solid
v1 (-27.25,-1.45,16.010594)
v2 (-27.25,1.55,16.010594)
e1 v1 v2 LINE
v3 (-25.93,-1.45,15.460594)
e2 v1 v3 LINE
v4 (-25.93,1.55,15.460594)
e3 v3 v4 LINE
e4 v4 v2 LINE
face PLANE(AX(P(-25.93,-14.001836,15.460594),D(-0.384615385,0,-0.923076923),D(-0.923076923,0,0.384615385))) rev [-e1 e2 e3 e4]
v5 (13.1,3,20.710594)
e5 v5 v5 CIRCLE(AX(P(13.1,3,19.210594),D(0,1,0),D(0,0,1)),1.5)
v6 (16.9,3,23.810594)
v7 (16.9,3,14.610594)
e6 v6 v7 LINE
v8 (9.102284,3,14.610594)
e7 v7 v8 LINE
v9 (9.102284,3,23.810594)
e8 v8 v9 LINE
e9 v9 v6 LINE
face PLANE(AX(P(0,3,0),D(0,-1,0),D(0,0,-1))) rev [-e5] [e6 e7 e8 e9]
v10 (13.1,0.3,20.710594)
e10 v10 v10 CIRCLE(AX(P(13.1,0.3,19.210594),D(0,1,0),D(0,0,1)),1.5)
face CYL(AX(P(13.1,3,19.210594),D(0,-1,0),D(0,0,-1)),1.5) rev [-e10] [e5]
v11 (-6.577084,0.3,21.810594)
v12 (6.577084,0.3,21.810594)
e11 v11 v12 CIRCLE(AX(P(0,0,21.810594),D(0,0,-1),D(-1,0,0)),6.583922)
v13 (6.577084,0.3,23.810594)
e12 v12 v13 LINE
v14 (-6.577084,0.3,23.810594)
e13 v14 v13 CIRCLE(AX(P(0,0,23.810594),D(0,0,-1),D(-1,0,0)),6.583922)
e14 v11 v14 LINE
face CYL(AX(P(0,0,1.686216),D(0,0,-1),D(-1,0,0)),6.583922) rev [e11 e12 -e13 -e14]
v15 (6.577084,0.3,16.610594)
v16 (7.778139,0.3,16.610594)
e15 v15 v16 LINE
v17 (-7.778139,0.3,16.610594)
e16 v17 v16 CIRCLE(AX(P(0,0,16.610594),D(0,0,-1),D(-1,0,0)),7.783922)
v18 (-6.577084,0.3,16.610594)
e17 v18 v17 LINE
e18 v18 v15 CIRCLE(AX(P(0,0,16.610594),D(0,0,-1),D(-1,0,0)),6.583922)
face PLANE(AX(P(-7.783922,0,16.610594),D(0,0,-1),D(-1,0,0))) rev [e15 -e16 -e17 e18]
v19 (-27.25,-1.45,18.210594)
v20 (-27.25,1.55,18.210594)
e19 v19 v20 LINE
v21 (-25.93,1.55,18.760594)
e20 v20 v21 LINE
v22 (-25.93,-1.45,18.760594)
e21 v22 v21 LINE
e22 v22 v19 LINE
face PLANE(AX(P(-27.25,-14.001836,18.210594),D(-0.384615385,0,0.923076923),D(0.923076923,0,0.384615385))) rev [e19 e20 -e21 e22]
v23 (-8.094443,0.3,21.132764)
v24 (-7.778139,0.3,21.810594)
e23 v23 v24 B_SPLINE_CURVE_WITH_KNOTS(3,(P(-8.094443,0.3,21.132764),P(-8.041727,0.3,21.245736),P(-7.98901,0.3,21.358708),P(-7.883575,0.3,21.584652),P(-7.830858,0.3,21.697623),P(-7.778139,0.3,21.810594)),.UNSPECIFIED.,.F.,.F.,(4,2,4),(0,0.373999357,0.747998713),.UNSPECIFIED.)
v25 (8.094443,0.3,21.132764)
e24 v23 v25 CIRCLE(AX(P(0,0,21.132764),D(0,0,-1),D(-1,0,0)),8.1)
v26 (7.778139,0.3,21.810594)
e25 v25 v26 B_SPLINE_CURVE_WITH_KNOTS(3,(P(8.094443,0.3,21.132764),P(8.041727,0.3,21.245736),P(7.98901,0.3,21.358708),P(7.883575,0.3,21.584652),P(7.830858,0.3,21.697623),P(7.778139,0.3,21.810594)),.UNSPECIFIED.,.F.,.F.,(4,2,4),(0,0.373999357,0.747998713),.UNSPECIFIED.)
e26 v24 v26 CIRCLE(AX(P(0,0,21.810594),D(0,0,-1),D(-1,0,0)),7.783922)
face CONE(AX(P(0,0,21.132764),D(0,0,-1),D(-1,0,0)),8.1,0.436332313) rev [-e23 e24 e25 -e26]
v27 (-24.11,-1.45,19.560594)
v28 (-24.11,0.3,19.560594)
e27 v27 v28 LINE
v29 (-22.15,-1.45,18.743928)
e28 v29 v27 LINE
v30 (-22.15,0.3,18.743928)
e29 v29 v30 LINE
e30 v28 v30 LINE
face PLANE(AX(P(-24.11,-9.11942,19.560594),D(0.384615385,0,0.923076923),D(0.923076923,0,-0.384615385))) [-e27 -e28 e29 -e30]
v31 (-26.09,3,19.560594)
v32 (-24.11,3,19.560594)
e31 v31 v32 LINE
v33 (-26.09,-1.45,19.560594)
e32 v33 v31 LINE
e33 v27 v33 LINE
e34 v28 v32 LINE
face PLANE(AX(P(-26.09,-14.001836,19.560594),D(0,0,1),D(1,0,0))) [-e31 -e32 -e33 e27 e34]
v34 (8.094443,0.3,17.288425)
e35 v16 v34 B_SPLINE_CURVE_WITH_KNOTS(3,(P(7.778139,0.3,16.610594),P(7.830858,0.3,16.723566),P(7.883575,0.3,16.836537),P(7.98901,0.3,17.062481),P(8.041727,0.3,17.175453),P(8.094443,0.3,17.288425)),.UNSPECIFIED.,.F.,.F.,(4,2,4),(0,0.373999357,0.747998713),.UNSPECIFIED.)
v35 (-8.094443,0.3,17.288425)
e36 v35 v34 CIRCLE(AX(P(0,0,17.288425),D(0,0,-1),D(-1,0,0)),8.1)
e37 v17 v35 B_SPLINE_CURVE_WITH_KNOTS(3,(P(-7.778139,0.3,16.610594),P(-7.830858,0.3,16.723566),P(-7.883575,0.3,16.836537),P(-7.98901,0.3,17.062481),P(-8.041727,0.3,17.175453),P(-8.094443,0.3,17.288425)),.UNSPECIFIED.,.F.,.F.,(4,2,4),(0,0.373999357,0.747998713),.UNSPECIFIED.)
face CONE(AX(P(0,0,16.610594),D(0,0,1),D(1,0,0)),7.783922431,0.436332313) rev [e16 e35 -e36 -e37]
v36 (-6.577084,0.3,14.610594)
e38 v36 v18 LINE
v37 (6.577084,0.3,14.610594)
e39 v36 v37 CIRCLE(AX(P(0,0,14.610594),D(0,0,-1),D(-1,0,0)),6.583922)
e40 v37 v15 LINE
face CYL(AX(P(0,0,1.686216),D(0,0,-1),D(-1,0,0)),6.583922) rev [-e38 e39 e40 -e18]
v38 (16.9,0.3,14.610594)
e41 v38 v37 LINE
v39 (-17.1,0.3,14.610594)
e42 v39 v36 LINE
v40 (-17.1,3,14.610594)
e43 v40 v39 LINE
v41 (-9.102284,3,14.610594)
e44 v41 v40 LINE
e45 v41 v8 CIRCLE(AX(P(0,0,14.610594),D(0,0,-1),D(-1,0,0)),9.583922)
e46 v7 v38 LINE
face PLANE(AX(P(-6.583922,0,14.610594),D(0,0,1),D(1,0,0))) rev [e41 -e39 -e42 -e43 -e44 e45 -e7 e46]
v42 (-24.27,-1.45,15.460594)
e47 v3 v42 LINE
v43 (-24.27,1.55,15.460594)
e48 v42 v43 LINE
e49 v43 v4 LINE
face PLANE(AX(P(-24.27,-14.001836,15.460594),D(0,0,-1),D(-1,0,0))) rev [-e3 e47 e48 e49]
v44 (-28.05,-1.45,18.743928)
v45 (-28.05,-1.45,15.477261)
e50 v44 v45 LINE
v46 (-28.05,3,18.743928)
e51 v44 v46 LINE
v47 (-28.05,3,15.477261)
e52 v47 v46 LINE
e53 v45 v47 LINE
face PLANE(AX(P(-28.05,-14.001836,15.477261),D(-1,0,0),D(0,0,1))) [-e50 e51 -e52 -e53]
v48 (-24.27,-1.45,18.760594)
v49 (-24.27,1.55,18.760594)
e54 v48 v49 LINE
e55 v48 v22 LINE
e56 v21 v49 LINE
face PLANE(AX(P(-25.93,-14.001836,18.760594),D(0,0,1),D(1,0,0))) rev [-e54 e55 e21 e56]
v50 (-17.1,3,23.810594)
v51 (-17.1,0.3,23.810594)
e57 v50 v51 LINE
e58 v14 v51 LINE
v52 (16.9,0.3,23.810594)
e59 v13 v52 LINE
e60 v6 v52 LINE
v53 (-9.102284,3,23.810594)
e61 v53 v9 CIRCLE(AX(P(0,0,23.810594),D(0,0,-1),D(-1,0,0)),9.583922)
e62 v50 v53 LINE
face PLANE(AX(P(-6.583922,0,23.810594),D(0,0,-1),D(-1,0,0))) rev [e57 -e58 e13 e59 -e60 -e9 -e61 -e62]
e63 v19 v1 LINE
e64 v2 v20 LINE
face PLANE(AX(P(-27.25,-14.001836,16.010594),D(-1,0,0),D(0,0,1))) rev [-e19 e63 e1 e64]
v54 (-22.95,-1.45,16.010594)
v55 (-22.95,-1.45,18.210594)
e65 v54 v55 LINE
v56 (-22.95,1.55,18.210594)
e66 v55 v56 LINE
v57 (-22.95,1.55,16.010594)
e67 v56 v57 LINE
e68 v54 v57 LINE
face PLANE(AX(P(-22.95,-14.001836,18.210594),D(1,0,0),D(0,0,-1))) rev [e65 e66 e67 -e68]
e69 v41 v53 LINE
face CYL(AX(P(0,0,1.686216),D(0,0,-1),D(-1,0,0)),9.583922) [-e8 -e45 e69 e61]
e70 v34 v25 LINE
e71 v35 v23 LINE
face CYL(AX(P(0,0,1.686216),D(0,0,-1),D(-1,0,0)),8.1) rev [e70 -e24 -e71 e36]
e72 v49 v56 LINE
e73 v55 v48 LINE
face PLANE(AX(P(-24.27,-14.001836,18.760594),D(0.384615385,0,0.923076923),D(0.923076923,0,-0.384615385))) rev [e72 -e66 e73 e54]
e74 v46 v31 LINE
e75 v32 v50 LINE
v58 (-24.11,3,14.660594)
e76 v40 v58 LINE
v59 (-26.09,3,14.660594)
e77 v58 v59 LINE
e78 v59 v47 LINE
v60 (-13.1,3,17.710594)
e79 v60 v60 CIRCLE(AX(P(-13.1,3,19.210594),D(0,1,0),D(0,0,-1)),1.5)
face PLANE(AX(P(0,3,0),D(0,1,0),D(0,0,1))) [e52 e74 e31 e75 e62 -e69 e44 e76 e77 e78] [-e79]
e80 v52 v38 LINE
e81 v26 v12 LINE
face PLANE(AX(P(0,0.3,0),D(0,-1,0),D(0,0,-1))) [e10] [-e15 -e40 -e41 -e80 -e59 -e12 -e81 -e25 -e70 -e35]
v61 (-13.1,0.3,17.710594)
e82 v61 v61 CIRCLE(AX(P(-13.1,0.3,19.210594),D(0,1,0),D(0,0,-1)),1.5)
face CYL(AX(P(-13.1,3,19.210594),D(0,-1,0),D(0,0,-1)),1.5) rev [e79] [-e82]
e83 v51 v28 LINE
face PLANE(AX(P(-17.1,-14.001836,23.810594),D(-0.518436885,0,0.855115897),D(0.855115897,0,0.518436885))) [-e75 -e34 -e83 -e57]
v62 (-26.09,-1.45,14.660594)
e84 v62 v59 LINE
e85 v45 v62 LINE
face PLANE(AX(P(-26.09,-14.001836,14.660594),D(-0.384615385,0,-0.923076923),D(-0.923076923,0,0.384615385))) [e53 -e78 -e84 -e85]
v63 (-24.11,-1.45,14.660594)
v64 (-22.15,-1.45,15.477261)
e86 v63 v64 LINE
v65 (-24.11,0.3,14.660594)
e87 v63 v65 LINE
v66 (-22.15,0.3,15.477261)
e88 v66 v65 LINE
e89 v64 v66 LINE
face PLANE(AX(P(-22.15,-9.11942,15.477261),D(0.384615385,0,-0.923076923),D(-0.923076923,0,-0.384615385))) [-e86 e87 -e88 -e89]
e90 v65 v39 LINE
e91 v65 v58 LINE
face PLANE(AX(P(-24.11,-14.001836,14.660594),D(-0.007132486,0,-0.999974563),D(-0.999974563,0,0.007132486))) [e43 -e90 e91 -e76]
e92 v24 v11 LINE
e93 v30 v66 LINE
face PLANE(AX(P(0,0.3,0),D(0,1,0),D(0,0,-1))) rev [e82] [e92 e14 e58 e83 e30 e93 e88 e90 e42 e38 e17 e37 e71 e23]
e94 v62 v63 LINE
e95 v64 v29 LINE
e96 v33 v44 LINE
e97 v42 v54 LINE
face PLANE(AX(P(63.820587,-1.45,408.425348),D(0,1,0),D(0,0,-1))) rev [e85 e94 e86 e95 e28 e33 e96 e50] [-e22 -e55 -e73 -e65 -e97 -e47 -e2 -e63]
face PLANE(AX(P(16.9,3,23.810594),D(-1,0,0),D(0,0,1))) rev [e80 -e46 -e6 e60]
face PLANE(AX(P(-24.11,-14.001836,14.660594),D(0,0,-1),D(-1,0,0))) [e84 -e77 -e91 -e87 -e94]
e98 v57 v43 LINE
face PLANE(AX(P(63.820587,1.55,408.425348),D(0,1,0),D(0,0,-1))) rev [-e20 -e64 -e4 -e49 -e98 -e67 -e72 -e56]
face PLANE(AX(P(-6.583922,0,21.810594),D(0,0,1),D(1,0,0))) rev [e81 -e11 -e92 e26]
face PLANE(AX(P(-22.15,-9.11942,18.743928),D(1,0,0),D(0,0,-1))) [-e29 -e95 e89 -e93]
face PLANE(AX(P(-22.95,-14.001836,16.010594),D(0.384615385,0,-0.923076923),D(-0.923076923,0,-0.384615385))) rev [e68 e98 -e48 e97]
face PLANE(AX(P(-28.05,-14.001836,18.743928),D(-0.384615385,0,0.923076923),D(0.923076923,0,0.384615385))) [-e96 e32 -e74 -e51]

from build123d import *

# Parameters (mm, degrees)
REVOLVE_1_ANGLE       = 180
SKETCH_3_W            = 9
SKETCH_3_H            = 9.2
SKETCH_3_R            = 1.5
EXTRUDE_2_DEPTH       = 3
MOVE_FACE_1_OUTLINE_W = 34.2
MOVE_FACE_1_OUTLINE_H = 9.2
MOVE_FACE_1_OUTLINE_R = 1.5
MOVE_FACE_1_DEPTH     = 0.3
EXTRUDE_3_DEPTH       = 2.7
EXTRUDE_4_DEPTH       = 4.45
EXTRUDE_5_DEPTH       = 1.45
MOVE_FACE_2_BY        = 0.2


# Read off the part's stored shape, not the designer's step: Переместить грань1
with BuildPart() as part:
    # Эскиз2 → Повернуть1 (revolve)
    with BuildSketch(Plane(origin=(0, 0, 0), x_dir=(1, 0, 0), z_dir=(0, 1, 0))):
        Polygon((6.583922431, -16.610594473), (6.583922431, -14.610594473), (9.583922431, -14.610594473), (9.583922431, -23.810594473), (6.583922431, -23.810594473), (6.583922431, -21.810594473), (7.783922431, -21.810594473), (8.1, -21.132763939), (8.1, -17.288425007), (7.783922431, -16.610594473), align=None)
    revolve(axis=Axis((0, 0, 1.686216313), (0, 0, 1)), revolution_arc=REVOLVE_1_ANGLE)

    # Эскиз3 → Бобышка-Вытянуть2 (add)
    # profile 1 of 2: a face of its own
    with BuildSketch(Plane(origin=(0, 0, 0), x_dir=(1, 0, 0), z_dir=(0, 1, 0))):
        with Locations((12.6, -19.210594473)):
            Rectangle(SKETCH_3_W, SKETCH_3_H)
        with Locations(Location((13.1, -19.210594473, 0), (0, 0, 270))):
            Circle(SKETCH_3_R, mode=Mode.SUBTRACT)
    # profile 2 of 2: a face of its own
    with BuildSketch(Plane(origin=(0, 0, 0), x_dir=(1, 0, 0), z_dir=(0, 1, 0))):
        with Locations((-12.6, -19.210594473)):
            Rectangle(SKETCH_3_W, SKETCH_3_H)
        with Locations(Location((-13.1, -19.210594473, 0), (0, 0, 90))):
            Circle(SKETCH_3_R, mode=Mode.SUBTRACT)
    extrude(amount=EXTRUDE_2_DEPTH)

    # Move Face 1 outline → Move Face 1 (cut)
    with BuildSketch(Plane(origin=(0, 0, 0), x_dir=(1, 0, 0), z_dir=(0, 1, 0))):
        with Locations((0, -19.210594473)):
            Rectangle(MOVE_FACE_1_OUTLINE_W, MOVE_FACE_1_OUTLINE_H)
        with Locations((-13.1, -19.210594473)):
            Circle(MOVE_FACE_1_OUTLINE_R, mode=Mode.SUBTRACT)
        with Locations((13.1, -19.210594473)):
            Circle(MOVE_FACE_1_OUTLINE_R, mode=Mode.SUBTRACT)
    extrude(amount=MOVE_FACE_1_DEPTH, mode=Mode.SUBTRACT)

    # Эскиз4 → Бобышка-Вытянуть3 (add)
    with BuildSketch(Plane(origin=(0, 3, 0), x_dir=(1, 0, 0), z_dir=(0, 1, 0))):
        Polygon((-24.11, -14.660594473), (-17.1, -14.610594473), (-17.1, -23.810594473), (-24.11, -19.560594473), (-26.09, -19.560594473), (-28.05, -18.743927806), (-28.05, -15.47726114), (-26.09, -14.660594473), align=None)
        Polygon((-27.25, -16.010594473), (-27.25, -18.210594473), (-25.93, -18.760594473), (-24.27, -18.760594473), (-22.95, -18.210594473), (-22.95, -16.010594473), (-24.27, -15.460594473), (-25.93, -15.460594473), align=None, mode=Mode.SUBTRACT)
    extrude(amount=-EXTRUDE_3_DEPTH)

    # Эскиз5 → Бобышка-Вытянуть4 (add)
    with BuildSketch(Plane(origin=(0, 3, 0), x_dir=(1, 0, 0), z_dir=(0, 1, 0))):
        Polygon((-28.05, -15.47726114), (-28.05, -18.743927806), (-26.09, -19.560594473), (-24.11, -19.560594473), (-22.15, -18.743927806), (-22.15, -15.47726114), (-24.11, -14.660594473), (-26.09, -14.660594473), align=None)
        Polygon((-27.25, -16.010594473), (-27.25, -18.210594473), (-25.93, -18.760594473), (-24.27, -18.760594473), (-22.95, -18.210594473), (-22.95, -16.010594473), (-24.27, -15.460594473), (-25.93, -15.460594473), align=None, mode=Mode.SUBTRACT)
    extrude(amount=-EXTRUDE_4_DEPTH)

    # Эскиз5<2> → Бобышка-Вытянуть5 (add)
    with BuildSketch(Plane(origin=(0, 3, 0), x_dir=(1, 0, 0), z_dir=(0, 1, 0))):
        Polygon((-25.93, -15.460594473), (-27.25, -16.010594473), (-27.25, -18.210594473), (-25.93, -18.760594473), (-24.27, -18.760594473), (-22.95, -18.210594473), (-22.95, -16.010594473), (-24.27, -15.460594473), align=None)
    extrude(amount=-EXTRUDE_5_DEPTH)

    # Move Face 2: a face moved inward by 0.2
    extrude(part.faces().sort_by_distance((17.1, 1.65, 19.210594473))[0], amount=MOVE_FACE_2_BY, dir=(-1, 0, 0), mode=Mode.SUBTRACT)


solid = part.part
